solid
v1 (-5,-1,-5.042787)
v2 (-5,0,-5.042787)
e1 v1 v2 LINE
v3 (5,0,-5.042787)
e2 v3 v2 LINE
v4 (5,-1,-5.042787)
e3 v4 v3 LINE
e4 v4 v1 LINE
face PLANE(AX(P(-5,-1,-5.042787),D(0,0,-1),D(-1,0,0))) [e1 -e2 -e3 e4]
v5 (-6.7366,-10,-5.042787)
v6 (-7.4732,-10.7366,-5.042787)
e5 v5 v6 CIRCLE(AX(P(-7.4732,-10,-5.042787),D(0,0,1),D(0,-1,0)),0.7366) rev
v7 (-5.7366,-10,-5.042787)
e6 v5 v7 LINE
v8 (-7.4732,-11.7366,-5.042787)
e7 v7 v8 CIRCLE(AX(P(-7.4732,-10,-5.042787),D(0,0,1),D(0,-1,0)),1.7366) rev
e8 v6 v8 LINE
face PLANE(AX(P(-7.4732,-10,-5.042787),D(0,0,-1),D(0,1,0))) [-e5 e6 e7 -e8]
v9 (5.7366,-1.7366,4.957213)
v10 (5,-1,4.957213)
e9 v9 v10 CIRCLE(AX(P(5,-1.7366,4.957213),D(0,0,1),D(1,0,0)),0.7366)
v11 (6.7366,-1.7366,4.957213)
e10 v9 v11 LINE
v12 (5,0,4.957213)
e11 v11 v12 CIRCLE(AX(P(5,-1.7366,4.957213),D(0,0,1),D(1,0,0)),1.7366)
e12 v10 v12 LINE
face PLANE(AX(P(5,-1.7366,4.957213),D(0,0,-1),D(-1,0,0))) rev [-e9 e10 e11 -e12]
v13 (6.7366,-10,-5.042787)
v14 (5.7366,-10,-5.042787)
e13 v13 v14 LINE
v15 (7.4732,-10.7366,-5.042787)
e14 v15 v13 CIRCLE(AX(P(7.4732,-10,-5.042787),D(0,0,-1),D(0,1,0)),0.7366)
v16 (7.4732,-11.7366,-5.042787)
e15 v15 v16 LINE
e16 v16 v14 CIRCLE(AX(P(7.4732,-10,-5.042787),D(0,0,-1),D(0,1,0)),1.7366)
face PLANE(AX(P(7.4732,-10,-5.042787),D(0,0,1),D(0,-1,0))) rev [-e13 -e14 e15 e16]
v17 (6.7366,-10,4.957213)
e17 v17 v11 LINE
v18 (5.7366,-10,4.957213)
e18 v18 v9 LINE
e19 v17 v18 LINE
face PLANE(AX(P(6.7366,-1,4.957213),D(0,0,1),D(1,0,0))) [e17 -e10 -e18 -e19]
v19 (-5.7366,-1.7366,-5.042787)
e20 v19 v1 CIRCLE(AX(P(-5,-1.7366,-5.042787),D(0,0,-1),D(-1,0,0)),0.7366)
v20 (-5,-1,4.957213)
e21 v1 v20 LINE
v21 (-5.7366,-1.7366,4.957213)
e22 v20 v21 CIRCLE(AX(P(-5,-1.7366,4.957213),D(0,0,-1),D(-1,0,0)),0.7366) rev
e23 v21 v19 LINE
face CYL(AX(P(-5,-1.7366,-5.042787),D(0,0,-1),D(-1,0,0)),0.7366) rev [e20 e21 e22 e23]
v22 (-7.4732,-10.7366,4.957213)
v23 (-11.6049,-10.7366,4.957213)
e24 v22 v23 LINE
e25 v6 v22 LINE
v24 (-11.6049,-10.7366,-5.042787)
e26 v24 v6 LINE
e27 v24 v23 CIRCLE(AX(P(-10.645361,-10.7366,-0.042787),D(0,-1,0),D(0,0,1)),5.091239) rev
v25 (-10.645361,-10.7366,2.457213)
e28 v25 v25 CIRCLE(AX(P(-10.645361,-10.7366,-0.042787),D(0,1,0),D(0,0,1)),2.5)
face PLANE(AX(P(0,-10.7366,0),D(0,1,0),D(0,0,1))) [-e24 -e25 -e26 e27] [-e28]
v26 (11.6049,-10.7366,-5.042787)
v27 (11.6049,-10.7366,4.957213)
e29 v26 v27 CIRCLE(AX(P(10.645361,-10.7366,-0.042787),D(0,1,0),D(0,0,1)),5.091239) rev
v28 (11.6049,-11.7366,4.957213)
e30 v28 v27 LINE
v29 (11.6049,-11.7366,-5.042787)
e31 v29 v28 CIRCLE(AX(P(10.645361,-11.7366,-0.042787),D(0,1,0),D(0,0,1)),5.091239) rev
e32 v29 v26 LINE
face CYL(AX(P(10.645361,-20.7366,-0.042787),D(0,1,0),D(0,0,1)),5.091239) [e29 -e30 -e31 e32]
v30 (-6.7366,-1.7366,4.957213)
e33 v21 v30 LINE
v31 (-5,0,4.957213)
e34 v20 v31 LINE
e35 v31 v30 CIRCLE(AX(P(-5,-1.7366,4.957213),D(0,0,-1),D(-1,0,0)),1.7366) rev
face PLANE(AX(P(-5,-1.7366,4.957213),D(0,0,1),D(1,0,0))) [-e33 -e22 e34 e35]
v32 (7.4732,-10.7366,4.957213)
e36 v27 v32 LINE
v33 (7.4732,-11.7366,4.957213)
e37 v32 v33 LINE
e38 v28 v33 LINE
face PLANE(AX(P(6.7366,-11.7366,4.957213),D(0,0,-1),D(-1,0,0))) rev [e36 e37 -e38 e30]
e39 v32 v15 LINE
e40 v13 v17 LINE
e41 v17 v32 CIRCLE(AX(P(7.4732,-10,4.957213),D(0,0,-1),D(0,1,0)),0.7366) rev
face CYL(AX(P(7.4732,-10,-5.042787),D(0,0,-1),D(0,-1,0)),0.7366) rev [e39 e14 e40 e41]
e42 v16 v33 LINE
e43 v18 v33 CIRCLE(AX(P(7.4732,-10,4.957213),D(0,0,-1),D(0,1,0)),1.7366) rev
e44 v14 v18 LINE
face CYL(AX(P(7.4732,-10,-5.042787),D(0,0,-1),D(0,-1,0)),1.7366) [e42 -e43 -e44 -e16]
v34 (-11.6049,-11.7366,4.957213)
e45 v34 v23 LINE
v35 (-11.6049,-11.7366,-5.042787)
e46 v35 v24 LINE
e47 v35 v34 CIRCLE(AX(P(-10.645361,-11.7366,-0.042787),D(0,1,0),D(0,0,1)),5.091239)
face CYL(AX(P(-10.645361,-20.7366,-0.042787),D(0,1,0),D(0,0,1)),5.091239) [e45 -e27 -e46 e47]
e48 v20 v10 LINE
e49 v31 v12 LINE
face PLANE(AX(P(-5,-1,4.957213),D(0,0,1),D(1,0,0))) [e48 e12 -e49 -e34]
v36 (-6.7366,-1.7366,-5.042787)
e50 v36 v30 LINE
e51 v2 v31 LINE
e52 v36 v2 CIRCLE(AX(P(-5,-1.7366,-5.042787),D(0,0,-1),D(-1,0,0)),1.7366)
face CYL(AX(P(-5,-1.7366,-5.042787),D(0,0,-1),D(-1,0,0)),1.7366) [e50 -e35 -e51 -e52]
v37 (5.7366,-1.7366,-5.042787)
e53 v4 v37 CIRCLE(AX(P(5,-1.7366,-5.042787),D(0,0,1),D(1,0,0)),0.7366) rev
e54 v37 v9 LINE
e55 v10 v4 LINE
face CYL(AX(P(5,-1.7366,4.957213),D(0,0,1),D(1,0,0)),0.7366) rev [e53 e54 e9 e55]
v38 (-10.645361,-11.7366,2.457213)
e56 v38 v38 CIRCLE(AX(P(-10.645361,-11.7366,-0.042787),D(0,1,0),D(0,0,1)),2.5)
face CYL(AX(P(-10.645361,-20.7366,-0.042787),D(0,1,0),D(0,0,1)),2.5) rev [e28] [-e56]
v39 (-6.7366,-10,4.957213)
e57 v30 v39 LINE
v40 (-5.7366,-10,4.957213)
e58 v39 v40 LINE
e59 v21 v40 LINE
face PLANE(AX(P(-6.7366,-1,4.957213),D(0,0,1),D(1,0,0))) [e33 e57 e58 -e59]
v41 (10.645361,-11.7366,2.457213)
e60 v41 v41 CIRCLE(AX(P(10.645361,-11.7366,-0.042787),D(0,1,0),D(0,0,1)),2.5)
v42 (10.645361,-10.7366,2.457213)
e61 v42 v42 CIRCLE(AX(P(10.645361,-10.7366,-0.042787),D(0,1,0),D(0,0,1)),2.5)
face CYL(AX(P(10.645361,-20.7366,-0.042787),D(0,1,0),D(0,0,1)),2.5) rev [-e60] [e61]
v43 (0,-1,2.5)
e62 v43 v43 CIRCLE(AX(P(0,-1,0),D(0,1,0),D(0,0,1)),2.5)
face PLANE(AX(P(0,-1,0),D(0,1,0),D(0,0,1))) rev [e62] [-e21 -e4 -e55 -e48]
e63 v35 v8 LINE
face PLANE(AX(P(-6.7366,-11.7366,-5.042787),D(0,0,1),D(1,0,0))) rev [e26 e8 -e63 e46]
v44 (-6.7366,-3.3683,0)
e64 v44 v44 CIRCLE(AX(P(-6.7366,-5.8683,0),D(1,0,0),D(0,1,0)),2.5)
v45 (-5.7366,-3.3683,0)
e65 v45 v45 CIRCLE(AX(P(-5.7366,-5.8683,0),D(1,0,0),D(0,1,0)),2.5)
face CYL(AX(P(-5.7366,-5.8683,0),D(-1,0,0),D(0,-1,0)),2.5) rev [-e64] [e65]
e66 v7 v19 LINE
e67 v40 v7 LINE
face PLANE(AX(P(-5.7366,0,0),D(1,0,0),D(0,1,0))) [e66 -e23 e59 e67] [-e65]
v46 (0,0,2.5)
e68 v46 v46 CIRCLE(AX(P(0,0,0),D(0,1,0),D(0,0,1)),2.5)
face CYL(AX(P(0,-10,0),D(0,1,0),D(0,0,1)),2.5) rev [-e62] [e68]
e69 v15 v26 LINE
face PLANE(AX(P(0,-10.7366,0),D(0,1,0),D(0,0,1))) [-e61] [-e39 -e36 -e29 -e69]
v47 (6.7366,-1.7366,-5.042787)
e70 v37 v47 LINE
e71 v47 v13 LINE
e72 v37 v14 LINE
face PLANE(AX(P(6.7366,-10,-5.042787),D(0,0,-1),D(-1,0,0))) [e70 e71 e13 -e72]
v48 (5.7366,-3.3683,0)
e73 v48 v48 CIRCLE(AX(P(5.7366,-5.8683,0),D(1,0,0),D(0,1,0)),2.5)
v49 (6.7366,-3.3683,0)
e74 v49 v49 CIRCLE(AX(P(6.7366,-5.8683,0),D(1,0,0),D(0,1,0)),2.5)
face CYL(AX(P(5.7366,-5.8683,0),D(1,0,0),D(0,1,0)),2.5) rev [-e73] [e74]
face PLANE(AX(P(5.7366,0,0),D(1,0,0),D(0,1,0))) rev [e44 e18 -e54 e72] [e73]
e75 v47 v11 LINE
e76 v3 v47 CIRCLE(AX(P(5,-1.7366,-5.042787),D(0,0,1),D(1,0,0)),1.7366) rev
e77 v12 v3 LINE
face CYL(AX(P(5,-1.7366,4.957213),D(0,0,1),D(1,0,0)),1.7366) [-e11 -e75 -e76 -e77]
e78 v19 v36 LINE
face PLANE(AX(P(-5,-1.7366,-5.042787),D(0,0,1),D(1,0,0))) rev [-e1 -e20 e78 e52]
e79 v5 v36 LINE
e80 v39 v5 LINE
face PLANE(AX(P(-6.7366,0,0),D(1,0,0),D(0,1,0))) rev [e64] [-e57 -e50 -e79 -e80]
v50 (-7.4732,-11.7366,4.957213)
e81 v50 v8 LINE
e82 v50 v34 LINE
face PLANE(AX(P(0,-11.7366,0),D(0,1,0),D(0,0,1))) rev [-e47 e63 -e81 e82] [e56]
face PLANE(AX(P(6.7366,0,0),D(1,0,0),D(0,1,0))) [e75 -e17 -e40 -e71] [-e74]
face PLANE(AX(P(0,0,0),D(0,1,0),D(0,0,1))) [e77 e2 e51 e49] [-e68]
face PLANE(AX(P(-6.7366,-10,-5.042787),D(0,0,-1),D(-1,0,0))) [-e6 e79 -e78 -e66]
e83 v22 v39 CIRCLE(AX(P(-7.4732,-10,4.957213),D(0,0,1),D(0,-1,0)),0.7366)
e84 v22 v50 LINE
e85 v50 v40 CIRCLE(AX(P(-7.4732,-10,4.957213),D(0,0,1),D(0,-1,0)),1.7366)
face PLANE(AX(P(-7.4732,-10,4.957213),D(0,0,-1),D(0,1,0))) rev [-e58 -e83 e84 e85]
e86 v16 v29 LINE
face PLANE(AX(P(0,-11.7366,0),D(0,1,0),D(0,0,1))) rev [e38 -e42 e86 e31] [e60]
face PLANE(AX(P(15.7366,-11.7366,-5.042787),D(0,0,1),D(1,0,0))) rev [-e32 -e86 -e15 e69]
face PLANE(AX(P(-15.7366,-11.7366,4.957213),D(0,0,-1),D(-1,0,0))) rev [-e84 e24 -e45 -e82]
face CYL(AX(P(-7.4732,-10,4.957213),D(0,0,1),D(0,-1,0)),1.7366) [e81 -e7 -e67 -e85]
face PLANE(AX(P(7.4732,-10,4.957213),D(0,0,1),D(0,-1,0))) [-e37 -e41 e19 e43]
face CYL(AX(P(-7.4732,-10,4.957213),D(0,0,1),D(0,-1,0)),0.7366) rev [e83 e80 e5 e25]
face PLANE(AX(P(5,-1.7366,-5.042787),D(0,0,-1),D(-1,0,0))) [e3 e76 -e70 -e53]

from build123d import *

# Parameters (mm, degrees)
SKETCH1_W               = 10
SKETCH1_H               = 10
BASE_FLANGE1_DEPTH      = 1
EDGE_FLANGE2_DEPTH      = 10
EDGE_FLANGE2_BEND_DEPTH = 10
EDGE_FLANGE3_DEPTH      = 10
EDGE_FLANGE3_BEND_DEPTH = 10
CUT_EXTRUDE1_DEPTH      = 10
SKETCH25_R              = 2.5
CUT_EXTRUDE2_DEPTH      = 10
SKETCH26_R              = 2.5
CUT_EXTRUDE3_DEPTH      = 10
SKETCH27_R              = 2.5
CUT_EXTRUDE4_DEPTH      = 1


# Sheet-metal steps are written as plain solids
with BuildPart() as part:
    # Sketch1 → Base-Flange1 (new body)
    with BuildSketch(Plane(origin=(0, 0, 0), x_dir=(1, 0, 0), z_dir=(0, 1, 0))):
        with Locations((0, 0.042787107)):
            Rectangle(SKETCH1_W, SKETCH1_H)
    extrude(amount=-BASE_FLANGE1_DEPTH)

    # Edge-Flange2 section (across the edge) → Edge-Flange2 (add)
    with BuildSketch(Plane(origin=(5.7366, -1, -5.042787107), x_dir=(-1, 0, 0), z_dir=(0, 0, 1))):
        with BuildLine():
            Line((-1, 0.7366), (-1, 9))
            Line((-1, 9), (0, 9))
            Line((0, 9), (0, 0.7366))
            ThreePointArc((0, 0.7366), (0.215745145, 0.215745145), (0.7366, 0))
            Line((0.7366, 0), (0.7366, -1))
            ThreePointArc((0.7366, -1), (-0.491361636, -0.491361636), (-1, 0.7366))
        make_face()
    extrude(amount=EDGE_FLANGE2_DEPTH)

    # Edge-Flange2 section 2 (across the edge) → Edge-Flange2 bend (add)
    with BuildSketch(Plane(origin=(-5.7366, -1, 4.957212893), x_dir=(1, 0, 0), z_dir=(0, 0, -1))):
        with BuildLine():
            Line((-1, 0.7366), (-1, 9))
            Line((-1, 9), (0, 9))
            Line((0, 9), (0, 0.7366))
            ThreePointArc((0, 0.7366), (0.215745145, 0.215745145), (0.7366, 0))
            Line((0.7366, 0), (0.7366, -1))
            ThreePointArc((0.7366, -1), (-0.491361636, -0.491361636), (-1, 0.7366))
        make_face()
    extrude(amount=EDGE_FLANGE2_BEND_DEPTH)

    # Edge-Flange3 section (across the edge) → Edge-Flange3 (add)
    with BuildSketch(Plane(origin=(6.7366, -10.7366, 4.957212893), x_dir=(0, 1, 0), z_dir=(0, 0, -1))):
        with BuildLine():
            Line((-1, 0.7366), (-1, 9))
            Line((-1, 9), (0, 9))
            Line((0, 9), (0, 0.7366))
            ThreePointArc((0, 0.7366), (0.215745145, 0.215745145), (0.7366, 0))
            Line((0.7366, 0), (0.7366, -1))
            ThreePointArc((0.7366, -1), (-0.491361636, -0.491361636), (-1, 0.7366))
        make_face()
    extrude(amount=EDGE_FLANGE3_DEPTH)

    # Edge-Flange3 section 2 (across the edge) → Edge-Flange3 bend (add)
    with BuildSketch(Plane(origin=(-6.7366, -10.7366, -5.042787107), x_dir=(0, 1, 0), z_dir=(0, 0, 1))):
        with BuildLine():
            Line((-1, 0.7366), (-1, 9))
            Line((-1, 9), (0, 9))
            Line((0, 9), (0, 0.7366))
            ThreePointArc((0, 0.7366), (0.215745145, 0.215745145), (0.7366, 0))
            Line((0.7366, 0), (0.7366, -1))
            ThreePointArc((0.7366, -1), (-0.491361636, -0.491361636), (-1, 0.7366))
        make_face()
    extrude(amount=EDGE_FLANGE3_BEND_DEPTH)

    # Sketch24 → Cut-Extrude1 (cut)
    with BuildSketch(Plane(origin=(0, -10.7366, 0), x_dir=(1, 0, 0), z_dir=(0, 1, 0))):
        with BuildLine():
            Line((15.7366, -4.957212893), (15.7366, 0.042787107))
            ThreePointArc((15.7366, 0.042787107), (14.57002385, -3.200318846), (11.6049, -4.957212893))
            Line((11.6049, -4.957212893), (15.7366, -4.957212893))
        make_face()
        with BuildLine():
            Line((15.7366, 5.042787107), (11.6049, 5.042787107))
            ThreePointArc((11.6049, 5.042787107), (14.57002385, 3.28589306), (15.7366, 0.042787107))
            Line((15.7366, 0.042787107), (15.7366, 5.042787107))
        make_face()
    cut_extrude1 = extrude(amount=-CUT_EXTRUDE1_DEPTH, mode=Mode.SUBTRACT)

    # Mirror1: Cut-Extrude1 across plane
    add(cut_extrude1.mirror(Plane(origin=(0, 0, 0), x_dir=(0, 0, 1), z_dir=(1, 0, 0))), mode=Mode.SUBTRACT)

    # Sketch25 → Cut-Extrude2 (cut)
    with BuildSketch(Plane(origin=(0, 0, 0), x_dir=(1, 0, 0), z_dir=(0, 1, 0))):
        with Locations(Location((0, 0, 0), (0, 0, 270))):
            Circle(SKETCH25_R)
    extrude(amount=-CUT_EXTRUDE2_DEPTH, mode=Mode.SUBTRACT)

    # Sketch26 → Cut-Extrude3 (cut)
    with BuildSketch(Plane(origin=(0, -10.7366, 0), x_dir=(1, 0, 0), z_dir=(0, 1, 0))):
        with Locations(Location((10.645360935, 0.042787107, 0), (0, 0, 270))):
            Circle(SKETCH26_R)
        with Locations(Location((-10.645360935, 0.042787107, 0), (0, 0, 270))):
            Circle(SKETCH26_R)
    extrude(amount=-CUT_EXTRUDE3_DEPTH, mode=Mode.SUBTRACT)

    # Sketch27 → Cut-Extrude4 (cut)
    with BuildSketch(Plane(origin=(6.7366, 0, 0), x_dir=(0, 0, -1), z_dir=(1, 0, 0))):
        with Locations(Location((0, -5.8683, 0), (0, 0, 90))):
            Circle(SKETCH27_R)
    cut_extrude4 = extrude(amount=-CUT_EXTRUDE4_DEPTH, mode=Mode.SUBTRACT)

    # Mirror2: Cut-Extrude4 across plane
    add(cut_extrude4.mirror(Plane(origin=(0, 0, 0), x_dir=(0, 0, 1), z_dir=(1, 0, 0))), mode=Mode.SUBTRACT)


solid = part.part
